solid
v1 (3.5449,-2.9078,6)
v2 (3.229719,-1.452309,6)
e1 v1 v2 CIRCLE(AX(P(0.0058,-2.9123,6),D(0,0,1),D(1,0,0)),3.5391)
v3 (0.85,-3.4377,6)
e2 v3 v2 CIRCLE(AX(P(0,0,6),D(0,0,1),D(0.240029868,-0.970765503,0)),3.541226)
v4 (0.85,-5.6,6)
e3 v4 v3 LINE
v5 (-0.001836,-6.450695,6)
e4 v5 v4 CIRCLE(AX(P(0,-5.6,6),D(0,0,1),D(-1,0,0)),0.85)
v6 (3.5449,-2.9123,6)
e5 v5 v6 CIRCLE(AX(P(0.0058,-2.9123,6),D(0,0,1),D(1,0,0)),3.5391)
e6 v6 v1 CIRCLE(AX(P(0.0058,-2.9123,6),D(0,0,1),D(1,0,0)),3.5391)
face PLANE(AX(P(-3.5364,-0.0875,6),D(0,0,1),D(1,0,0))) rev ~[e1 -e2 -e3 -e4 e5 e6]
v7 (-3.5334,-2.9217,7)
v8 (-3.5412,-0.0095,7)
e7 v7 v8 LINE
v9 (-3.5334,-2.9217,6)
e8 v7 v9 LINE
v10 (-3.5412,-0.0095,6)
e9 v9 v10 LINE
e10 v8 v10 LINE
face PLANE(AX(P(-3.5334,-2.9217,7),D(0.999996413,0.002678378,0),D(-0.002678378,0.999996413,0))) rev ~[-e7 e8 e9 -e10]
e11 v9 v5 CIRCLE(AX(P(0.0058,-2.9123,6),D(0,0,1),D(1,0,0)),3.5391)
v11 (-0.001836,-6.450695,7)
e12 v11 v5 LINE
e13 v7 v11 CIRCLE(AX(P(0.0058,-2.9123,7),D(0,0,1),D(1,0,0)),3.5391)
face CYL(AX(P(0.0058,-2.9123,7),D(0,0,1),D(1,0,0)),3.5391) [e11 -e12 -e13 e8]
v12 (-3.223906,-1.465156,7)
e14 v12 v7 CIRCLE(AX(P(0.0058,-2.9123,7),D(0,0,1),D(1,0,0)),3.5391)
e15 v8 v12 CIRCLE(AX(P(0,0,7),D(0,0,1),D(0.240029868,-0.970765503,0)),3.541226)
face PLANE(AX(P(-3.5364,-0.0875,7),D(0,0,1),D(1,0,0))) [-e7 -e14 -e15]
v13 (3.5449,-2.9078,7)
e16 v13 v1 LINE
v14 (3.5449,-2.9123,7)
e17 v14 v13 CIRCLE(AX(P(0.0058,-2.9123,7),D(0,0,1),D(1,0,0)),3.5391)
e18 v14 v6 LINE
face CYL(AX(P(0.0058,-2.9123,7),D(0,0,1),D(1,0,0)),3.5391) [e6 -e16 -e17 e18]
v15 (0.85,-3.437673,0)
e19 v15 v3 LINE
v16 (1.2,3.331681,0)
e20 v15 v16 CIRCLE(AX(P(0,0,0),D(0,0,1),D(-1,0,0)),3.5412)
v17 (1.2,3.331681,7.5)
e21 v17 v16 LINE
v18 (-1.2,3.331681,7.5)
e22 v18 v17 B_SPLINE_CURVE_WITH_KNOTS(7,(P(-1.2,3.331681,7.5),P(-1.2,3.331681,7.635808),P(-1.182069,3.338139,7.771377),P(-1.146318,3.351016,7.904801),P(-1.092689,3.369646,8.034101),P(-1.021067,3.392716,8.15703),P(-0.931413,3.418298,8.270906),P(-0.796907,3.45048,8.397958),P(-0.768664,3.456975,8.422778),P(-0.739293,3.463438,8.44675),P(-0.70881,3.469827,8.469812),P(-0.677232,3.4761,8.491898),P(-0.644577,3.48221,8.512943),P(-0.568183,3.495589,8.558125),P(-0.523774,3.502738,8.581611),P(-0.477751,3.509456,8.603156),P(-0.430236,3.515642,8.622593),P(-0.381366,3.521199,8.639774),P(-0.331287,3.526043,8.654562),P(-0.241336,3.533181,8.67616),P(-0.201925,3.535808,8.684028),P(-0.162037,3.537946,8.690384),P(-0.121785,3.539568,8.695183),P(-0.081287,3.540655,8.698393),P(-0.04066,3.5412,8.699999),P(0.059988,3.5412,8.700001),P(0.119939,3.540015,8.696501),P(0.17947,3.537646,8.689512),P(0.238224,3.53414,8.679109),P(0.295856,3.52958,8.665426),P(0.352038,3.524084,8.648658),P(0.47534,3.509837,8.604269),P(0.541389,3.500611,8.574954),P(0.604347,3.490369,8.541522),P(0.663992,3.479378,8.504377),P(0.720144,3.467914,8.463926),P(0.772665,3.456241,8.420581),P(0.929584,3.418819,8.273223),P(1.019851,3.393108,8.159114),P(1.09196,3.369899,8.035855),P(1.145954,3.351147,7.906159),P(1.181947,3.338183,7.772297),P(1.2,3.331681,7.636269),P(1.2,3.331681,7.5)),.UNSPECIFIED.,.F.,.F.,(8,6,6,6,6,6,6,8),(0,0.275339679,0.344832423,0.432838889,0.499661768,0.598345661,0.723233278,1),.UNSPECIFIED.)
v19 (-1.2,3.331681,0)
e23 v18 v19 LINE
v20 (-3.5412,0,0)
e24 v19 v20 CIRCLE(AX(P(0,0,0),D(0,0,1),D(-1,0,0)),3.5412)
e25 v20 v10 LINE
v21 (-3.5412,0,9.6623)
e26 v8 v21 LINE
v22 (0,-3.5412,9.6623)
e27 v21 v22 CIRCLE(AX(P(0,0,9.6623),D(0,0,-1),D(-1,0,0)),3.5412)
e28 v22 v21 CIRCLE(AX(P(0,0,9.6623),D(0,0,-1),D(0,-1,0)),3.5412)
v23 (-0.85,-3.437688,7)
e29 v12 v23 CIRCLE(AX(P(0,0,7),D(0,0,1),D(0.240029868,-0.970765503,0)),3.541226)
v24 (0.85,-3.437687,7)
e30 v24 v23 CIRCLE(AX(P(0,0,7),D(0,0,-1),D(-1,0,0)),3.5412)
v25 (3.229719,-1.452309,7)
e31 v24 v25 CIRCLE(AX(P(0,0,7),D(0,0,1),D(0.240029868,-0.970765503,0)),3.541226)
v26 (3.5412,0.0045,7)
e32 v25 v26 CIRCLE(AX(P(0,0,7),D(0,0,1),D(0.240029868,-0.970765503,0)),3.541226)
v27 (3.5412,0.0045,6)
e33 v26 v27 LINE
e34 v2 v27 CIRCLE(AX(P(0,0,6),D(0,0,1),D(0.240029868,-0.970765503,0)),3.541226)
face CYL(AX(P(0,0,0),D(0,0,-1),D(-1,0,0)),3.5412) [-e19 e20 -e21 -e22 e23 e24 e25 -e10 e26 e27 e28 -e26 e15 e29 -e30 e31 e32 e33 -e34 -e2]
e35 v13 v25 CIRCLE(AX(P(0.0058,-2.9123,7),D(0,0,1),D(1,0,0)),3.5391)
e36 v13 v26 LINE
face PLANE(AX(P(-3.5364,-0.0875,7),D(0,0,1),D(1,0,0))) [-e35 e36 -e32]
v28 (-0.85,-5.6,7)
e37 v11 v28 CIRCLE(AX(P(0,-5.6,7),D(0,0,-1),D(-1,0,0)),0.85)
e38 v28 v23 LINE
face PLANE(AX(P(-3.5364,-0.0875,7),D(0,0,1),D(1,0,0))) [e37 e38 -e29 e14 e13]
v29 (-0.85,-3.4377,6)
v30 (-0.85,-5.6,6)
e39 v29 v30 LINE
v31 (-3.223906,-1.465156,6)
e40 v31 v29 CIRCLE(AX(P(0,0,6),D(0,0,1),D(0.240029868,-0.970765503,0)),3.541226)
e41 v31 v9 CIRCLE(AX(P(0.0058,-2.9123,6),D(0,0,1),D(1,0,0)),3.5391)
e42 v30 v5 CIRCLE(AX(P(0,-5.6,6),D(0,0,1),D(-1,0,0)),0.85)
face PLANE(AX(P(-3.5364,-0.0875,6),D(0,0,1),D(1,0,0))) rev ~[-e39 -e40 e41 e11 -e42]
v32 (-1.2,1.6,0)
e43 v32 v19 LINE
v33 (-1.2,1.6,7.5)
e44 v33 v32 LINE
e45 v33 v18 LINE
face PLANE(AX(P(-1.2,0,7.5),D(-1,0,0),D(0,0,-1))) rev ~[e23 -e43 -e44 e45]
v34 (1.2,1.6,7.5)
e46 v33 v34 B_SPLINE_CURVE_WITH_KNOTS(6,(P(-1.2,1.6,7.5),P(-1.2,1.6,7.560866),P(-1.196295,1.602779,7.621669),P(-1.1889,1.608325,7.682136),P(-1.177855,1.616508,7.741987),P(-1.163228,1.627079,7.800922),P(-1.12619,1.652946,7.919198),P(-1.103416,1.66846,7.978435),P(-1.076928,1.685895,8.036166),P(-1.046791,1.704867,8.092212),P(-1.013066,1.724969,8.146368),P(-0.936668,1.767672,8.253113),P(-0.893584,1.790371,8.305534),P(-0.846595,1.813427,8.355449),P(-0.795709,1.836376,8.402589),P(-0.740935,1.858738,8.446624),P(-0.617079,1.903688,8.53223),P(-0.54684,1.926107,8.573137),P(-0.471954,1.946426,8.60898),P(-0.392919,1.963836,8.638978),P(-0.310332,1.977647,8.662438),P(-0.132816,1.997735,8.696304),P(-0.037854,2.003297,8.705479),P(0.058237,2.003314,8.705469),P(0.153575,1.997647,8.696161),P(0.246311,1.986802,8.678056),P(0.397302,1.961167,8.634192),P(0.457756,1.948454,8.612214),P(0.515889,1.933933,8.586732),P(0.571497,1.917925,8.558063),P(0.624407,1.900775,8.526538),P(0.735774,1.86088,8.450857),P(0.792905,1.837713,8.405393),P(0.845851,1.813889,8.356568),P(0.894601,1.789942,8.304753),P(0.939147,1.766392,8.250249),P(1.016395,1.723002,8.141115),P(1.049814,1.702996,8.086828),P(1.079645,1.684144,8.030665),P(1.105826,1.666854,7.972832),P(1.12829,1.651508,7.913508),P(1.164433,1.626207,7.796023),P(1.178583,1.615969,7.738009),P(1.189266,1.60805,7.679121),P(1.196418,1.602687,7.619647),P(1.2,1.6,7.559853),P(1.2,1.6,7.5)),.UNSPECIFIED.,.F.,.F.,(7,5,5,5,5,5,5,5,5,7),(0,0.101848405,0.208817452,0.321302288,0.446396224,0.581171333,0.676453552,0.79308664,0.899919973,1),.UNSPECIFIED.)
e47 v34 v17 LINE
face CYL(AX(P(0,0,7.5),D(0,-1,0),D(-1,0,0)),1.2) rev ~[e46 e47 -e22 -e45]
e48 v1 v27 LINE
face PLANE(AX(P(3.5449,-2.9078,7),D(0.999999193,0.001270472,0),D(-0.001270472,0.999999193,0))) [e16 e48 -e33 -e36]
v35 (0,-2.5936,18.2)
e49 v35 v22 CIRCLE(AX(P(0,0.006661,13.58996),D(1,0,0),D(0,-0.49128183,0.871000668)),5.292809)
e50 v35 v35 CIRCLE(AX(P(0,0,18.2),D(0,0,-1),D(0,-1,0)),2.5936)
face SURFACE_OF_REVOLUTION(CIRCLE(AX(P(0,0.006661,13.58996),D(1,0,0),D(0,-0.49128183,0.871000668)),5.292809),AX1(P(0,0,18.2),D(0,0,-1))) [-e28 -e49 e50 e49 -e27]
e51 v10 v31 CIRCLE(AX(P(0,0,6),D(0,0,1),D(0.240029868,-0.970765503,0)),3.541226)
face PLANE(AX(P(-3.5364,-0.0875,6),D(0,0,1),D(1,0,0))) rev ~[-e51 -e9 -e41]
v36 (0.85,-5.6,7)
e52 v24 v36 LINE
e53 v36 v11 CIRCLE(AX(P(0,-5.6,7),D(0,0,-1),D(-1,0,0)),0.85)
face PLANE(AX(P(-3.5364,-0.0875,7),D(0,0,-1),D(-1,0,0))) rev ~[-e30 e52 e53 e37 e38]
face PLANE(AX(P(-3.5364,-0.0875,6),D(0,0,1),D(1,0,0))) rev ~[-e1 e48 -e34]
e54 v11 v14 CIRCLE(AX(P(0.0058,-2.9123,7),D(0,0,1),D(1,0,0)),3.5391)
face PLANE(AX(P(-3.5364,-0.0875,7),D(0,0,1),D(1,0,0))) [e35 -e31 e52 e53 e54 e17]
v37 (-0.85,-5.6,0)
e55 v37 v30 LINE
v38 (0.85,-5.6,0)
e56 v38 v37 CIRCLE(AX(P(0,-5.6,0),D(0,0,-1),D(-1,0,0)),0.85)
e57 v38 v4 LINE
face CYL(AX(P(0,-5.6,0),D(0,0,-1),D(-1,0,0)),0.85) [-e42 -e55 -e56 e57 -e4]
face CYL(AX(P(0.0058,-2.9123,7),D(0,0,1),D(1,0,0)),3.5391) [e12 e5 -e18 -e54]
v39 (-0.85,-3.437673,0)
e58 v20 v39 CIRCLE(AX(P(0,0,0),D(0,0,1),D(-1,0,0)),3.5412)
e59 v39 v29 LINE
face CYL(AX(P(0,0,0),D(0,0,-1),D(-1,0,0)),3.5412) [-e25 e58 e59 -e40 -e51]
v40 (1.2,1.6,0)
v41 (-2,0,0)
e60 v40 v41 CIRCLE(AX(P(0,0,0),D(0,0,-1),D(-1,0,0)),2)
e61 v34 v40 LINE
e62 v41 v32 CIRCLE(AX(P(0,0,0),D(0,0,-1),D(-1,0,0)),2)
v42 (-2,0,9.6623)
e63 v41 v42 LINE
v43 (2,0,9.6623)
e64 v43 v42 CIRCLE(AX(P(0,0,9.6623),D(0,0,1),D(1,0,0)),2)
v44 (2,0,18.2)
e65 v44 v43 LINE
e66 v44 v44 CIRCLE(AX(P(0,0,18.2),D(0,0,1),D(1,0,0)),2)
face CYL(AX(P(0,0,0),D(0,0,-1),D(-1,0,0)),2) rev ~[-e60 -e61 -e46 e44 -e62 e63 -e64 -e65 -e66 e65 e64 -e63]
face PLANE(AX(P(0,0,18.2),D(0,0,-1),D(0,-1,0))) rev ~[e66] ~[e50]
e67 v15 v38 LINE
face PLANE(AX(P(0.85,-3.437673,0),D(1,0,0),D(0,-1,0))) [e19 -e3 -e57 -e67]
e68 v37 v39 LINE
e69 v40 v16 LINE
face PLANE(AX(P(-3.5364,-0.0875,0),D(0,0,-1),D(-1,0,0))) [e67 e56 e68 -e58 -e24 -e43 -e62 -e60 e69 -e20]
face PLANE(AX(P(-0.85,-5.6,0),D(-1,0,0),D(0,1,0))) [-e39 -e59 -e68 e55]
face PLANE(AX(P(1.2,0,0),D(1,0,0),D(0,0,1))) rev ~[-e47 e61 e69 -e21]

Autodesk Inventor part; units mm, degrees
ref_plane "YZ Plane" through (0, 0, 0) normal (1, 0, 0) x (0, 1, 0)
ref_plane "XY Plane" through (0, 0, 0) normal (0, 0, 1) x (1, 0, 0)
sketch "Náčrt2" plane through (0, 0, 0) normal (1, 0, 0) x (0, 1, 0)
  line L0 (-2.5936, 18.2) -> (2.6216, 18.2) projected
  line L1 (-6.458, 6.9989) -> (0.6548, 6.9989) projected
  line L2 (-3.5412, 9.6623) -> (3.7182, 9.6623) projected
  line L3 (0, 18.2) -> (0, 9.6623)
  arc A0 (-2.5936, 18.2) -> (-3.5412, 9.6623) centre (0.0066, 13.59) ccw
  line L4 (0, 18.2) -> (0, 0)
revolve "Rotace1" add sketch "Náčrt2" angle 360 about axis through (0, 0, 18.2) along (0, 0, -1)
sketch "Náčrt3" plane through (0, 0, 18.2) normal (0, 0, 1) x (1, 0, 0)
  circle A0 centre (0, 0) radius 2
  dimension "d1" = 4
extrude "Vysunutí1" cut sketch "Náčrt3" against normal blind 10
sketch "Náčrt4" plane through (-3.5364, -0.0875, 0) normal (0, 0, -1) x (-1, 0, 0)
  circle A0 centre (-3.5364, 0.0875) radius 3.5412 projected
  circle A1 centre (-3.5364, 0.0875) radius 2 projected
  line L0 (-2.6864, -5.5125) -> (-2.6864, -3.3464) projected
  circle A2 centre (-3.5364, -5.5125) radius 0.85 projected
  line L1 (-4.3864, -3.3464) -> (-4.3864, -5.5125) projected
  point P0 (-3.5364, 0.0875)
  point P1 (-4.3864, -3.3502)
  point P2 (-2.6864, -3.3502)
extrude "Vysunutí2" add sketch "Náčrt4" against normal blind 10 contours A0
sketch "Náčrt5" plane through (-3.5364, -0.0875, 0) normal (0, 0, -1) x (-1, 0, 0)
  point P0 (-3.5364, 0.0875)
extrude "Vysunutí3" add sketch "Náčrt4" against normal blind 7 contours A0 L0 A2 L1 | A2
sketch "Náčrt6" plane through (0, 0, 0) normal (0, 1, 0) x (-1, 0, 0)
  line L0 (0, 0) -> (-1.2, 0)
  line L1 (2, 0) -> (-2, 0) projected
  line L2 (-1.2, 0) -> (-1.2, 7.5)
  line L3 (-1.2, 7.5) -> (1.2, 7.5)
  line L4 (1.2, 7.5) -> (1.2, 0)
  arc A0 (1.2, 7.5) -> (-1.2, 7.5) centre (0, 7.5) ccw
  line L5 (0, 0) -> (1.2, 0)
  line L6 (-1.2, 7.5) -> (1.2, 7.5)
  line L7 (-1.2, 0) -> (1.2, 0)
  line L8 (1.2, 7.5) -> (1.2, 0)
  line L9 (1.2, 7.5) -> (-1.2, 7.5)
  line L10 (-1.2, 7.5) -> (-1.2, 0)
  dimension "d11" = 1.2
  dimension "d12" = 7.5
  dimension "d13" = 2.4
ref_plane "Pracovní rovina1" through (0, 2.75, 0) normal (0, 1, 0) x (-1, 0, 0)
sketch "Náčrt7" plane through (0, 0, 0) normal (0, 1, 0) x (-1, 0, 0)
  line L0 (1.2, 7.447) -> (1.2, 0) projected
  line L1 (-1.2, 7.447) -> (1.2041, 7.447)
  line L2 (1.2041, 7.447) -> (1.2041, 7.4445)
  line L3 (-1.2, 7.4445) -> (-1.2, 7.447)
  line L4 (1.2, 7.4445) -> (1.2, 0)
  line L5 (1.2, 0) -> (-1.2, 0)
  ellipse E0 centre (0.0021, 7.4458) end of major axis (0.0038, 9.0631) minor radius 1.2021 (1.2041, 7.4445) -> (-1.2, 7.4355) ccw
  line L6 (1.2, 7.4445) -> (1.2, 7.447)
  line L7 (1.2, 7.447) -> (-1.2, 7.447)
  line L8 (-1.2, 7.447) -> (-1.2, 7.4445)
  line L9 (-1.2, 0) -> (1.2041, 0)
  line L10 (1.2041, 0) -> (1.2041, 7.447)
  line L11 (1.2041, 7.447) -> (-1.2, 7.447)
  line L12 (-1.2, 7.447) -> (-1.2, 0)
  point P0 (0, 0)
  dimension "d9" = 2.4
  dimension "d10" = 7.447
extrude "Vysunutí4" cut sketch "Náčrt6" along normal blind 10
sketch "Náčrt8" plane through (-3.5364, -0.0875, 7) normal (0, 0, 1) x (1, 0, 0)
  arc A0 (2.6864, -5.5125) -> (4.3864, -5.5125) centre (3.5364, -5.5125) ccw projected
  line L0 (2.6864, -3.3502) -> (2.6864, -5.5125) projected
  line L1 (4.3864, -5.5125) -> (4.3864, -3.3502) projected
  arc A1 (4.3864, -3.3502) -> (2.6864, -3.3502) centre (3.5364, 0.0875) ccw projected
  arc A2 (4.3864, -3.3502) -> (4.7364, 3.4192) centre (3.5364, 0.0875) ccw projected
  arc A3 (2.3364, 1.6875) -> (4.7364, 1.6875) centre (3.5364, 0.0875) ccw projected
  circle A4 centre (3.5422, -2.8248) radius 3.5391 projected
  line L2 (4.3864, -3.3502) -> (4.3864, -5.5125) projected
  arc A5 (2.6864, -5.5125) -> (4.3864, -5.5125) centre (3.5364, -5.5125) ccw projected
  line L3 (2.6864, -5.5125) -> (2.6864, -3.3502) projected
  line L4 (7.0813, -2.8203) -> (7.0776, 0.092)
  line L5 (0.003, -2.8342) -> (-0.0048, 0.078)
  line L6 (2.6864, -5.5125) -> (2.6864, -3.3502) projected
  arc A6 (2.6864, -5.5125) -> (4.3864, -5.5125) centre (3.5364, -5.5125) ccw projected
  arc A7 (2.3364, 3.4192) -> (2.6864, -3.3502) centre (3.5364, 0.0875) ccw projected
  line L7 (4.3864, -3.3502) -> (4.3864, -5.5125) projected
  arc A8 (2.6864, -5.5125) -> (4.3864, -5.5125) centre (3.5364, -5.5125) ccw projected
  line L8 (2.6864, -5.5125) -> (2.6864, -3.3502) projected
  arc A9 (2.3364, 1.6875) -> (4.7364, 1.6875) centre (3.5364, 0.0875) ccw projected
  line L9 (4.7364, 1.6875) -> (4.7364, 3.4192) projected
  arc A10 (4.3864, -3.3502) -> (4.7364, 3.4192) centre (3.5364, 0.0875) ccw projected
  line L10 (2.3364, 3.4192) -> (2.3364, 1.6875) projected
  line L11 (4.7364, 1.6875) -> (4.7364, 3.4192) projected
  arc A11 (2.3364, 3.4192) -> (2.6864, -3.3502) centre (3.5364, 0.0875) ccw projected
  line L12 (2.3364, 3.4192) -> (2.3364, 1.6875) projected
  point P0 (3.5364, 0.0875)
  point P1 (7.0776, 0.092)
  point P2 (-0.0048, 0.078)
extrude "Vysunutí5" add sketch "Náčrt8" against normal blind 1 contours A0 A4 A1 L0 | A0 L1 A1 A4 | L5 A1 A4 | A4 A1 L4
sketch "Náčrt9" plane through (-3.5364, -0.0875, 0) normal (0, 0, -1) x (-1, 0, 0)
  circle A0 centre (-3.5364, 0.0875) radius 2
  circle A1 centre (-3.5364, 0.0875) radius 3.5412
  circle A2 centre (-3.5364, -5.5125) radius 0.85
  line L0 (-4.3864, -5.5125) -> (-4.3864, -3.3502)
  line L1 (-2.6864, -5.5125) -> (-2.6864, -3.3502)
  line L2 (-4.7364, 1.6875) -> (-4.7364, 3.4192)
  line L3 (-2.3364, 1.6875) -> (-2.3364, 3.4192)
  point P0 (-3.5364, 0.0875)
properties part number "New_11_Base_Joint"
